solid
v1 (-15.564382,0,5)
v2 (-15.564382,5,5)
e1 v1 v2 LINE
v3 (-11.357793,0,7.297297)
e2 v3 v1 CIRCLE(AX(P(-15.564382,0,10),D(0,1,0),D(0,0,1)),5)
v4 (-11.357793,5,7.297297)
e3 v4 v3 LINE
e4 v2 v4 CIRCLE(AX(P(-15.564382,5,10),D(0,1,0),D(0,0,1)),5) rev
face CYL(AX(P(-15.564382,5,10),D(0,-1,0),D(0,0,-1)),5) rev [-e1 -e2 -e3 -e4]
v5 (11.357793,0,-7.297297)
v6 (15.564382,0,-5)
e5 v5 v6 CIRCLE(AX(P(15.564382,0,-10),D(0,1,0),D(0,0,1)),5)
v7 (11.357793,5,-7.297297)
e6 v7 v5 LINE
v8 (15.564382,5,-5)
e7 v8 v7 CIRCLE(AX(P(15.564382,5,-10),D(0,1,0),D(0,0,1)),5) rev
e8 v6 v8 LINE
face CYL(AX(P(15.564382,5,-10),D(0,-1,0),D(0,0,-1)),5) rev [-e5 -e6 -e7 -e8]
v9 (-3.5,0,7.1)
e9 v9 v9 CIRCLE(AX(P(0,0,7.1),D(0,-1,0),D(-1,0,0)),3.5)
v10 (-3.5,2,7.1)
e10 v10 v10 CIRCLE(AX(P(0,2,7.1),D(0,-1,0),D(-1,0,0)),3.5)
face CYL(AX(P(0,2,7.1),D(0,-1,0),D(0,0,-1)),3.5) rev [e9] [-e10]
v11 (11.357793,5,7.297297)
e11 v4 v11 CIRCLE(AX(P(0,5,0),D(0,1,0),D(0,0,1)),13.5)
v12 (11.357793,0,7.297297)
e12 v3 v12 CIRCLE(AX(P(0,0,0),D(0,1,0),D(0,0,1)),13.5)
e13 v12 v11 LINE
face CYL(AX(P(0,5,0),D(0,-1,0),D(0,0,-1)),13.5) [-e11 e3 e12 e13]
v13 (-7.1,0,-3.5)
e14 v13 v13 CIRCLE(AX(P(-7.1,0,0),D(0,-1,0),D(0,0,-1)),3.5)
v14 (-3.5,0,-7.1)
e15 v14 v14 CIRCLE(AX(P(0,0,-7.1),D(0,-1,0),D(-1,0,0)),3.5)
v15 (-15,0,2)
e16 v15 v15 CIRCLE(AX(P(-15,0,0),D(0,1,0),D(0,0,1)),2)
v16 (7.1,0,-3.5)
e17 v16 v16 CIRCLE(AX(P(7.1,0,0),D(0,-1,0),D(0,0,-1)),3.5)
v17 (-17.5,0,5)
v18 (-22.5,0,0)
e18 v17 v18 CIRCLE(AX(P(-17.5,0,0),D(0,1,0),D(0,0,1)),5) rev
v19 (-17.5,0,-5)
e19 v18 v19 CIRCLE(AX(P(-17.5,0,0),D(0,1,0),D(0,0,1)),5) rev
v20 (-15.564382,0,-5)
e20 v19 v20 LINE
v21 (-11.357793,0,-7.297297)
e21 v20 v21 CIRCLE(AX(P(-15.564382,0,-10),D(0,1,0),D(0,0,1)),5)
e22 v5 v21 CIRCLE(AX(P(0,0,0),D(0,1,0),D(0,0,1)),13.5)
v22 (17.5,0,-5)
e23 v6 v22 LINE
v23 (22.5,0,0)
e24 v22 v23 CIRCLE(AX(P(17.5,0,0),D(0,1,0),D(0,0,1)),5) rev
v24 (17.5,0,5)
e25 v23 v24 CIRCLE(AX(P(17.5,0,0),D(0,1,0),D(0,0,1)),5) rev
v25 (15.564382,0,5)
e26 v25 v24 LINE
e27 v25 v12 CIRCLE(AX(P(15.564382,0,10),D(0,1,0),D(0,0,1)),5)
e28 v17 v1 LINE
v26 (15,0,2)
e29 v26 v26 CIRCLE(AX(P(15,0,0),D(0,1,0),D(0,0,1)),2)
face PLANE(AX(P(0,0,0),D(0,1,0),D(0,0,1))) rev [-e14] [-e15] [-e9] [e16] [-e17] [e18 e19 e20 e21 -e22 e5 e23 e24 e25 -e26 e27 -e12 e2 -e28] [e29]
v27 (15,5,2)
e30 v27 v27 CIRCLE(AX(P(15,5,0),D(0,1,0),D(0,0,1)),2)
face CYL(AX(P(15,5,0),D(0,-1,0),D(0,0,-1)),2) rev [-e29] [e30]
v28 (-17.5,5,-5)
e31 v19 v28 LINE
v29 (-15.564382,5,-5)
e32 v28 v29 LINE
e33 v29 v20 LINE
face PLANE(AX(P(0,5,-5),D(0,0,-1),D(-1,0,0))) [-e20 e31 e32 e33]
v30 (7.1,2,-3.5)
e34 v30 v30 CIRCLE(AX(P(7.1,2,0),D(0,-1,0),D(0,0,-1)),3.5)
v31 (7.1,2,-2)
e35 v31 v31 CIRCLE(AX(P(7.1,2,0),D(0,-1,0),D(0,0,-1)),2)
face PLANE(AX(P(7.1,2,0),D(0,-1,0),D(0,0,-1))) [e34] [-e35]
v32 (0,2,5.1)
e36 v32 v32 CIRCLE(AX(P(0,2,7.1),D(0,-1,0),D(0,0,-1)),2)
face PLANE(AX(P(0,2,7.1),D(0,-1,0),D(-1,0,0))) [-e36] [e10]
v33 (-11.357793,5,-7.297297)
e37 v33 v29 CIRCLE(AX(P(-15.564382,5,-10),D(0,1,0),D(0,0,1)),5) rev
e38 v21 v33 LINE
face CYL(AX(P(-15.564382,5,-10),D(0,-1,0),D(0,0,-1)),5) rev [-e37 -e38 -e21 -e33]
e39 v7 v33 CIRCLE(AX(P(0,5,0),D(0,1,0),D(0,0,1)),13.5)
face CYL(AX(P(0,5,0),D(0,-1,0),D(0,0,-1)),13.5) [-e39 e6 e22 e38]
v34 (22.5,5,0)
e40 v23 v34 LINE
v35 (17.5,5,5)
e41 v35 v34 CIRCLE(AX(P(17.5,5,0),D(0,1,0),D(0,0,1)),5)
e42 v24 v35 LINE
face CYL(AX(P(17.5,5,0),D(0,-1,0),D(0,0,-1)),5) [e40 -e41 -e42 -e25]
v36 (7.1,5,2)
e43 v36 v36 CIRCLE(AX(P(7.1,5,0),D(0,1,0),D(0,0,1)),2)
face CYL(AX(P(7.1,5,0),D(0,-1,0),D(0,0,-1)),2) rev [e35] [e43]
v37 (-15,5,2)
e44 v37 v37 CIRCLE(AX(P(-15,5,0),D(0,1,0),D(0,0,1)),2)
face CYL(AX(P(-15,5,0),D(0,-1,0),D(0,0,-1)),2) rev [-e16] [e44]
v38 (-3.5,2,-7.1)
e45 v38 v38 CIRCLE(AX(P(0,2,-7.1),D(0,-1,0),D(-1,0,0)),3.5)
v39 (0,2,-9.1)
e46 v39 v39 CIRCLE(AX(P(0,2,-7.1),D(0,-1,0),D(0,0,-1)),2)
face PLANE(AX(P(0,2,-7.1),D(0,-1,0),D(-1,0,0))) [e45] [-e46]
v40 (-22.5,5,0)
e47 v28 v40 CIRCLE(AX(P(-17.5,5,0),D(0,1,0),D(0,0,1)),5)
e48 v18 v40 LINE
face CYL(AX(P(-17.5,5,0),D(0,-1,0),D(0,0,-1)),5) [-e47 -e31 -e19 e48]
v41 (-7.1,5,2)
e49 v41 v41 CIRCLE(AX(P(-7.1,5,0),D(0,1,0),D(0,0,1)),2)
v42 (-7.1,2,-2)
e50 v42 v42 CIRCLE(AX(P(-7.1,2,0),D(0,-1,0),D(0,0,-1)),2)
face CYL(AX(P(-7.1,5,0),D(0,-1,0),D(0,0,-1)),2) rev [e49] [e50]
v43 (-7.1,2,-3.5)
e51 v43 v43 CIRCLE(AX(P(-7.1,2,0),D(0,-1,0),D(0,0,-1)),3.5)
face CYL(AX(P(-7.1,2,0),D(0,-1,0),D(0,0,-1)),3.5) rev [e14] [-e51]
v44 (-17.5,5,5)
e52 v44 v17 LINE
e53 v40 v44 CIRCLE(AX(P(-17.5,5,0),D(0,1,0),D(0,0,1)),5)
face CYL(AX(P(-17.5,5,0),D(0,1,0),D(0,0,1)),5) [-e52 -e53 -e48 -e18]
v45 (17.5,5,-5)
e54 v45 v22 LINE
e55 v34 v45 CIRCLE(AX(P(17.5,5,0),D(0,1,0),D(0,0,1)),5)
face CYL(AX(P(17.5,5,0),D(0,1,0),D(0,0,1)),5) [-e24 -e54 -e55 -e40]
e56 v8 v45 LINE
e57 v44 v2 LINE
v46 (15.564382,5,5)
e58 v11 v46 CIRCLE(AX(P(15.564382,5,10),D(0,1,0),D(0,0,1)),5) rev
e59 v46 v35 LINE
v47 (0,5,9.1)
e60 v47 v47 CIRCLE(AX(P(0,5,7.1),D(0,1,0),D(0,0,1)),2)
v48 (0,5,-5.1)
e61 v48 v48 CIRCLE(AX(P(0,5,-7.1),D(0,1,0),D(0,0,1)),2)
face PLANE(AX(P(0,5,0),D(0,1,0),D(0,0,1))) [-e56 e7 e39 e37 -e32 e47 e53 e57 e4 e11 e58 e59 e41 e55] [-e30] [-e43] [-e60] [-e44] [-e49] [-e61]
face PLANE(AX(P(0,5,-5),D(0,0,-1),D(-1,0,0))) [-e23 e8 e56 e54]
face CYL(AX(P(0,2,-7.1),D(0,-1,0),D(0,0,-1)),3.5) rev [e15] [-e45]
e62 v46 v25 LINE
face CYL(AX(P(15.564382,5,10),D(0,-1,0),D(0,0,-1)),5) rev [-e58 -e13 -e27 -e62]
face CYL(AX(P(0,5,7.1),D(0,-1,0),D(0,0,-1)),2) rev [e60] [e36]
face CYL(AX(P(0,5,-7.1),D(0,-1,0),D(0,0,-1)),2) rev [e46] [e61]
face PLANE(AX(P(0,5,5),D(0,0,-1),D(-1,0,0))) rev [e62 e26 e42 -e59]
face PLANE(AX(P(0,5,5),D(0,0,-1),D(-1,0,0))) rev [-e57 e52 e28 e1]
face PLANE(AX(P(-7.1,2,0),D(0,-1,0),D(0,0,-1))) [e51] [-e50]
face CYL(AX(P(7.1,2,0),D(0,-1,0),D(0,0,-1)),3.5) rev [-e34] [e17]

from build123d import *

# Parameters (mm, degrees)
SKETCH1_R           = 2
BOSS_EXTRUDE1_DEPTH = 5
FILLET1_R           = 5
FILLET2_R           = 5
SKETCH3_R           = 3.5
CUT_EXTRUDE2_DEPTH  = 2
CIRPATTERN1_COUNT   = 2
CIRPATTERN1_ANGLE   = 90


with BuildPart() as part:
    # Sketch1 → Boss-Extrude1 (new body)
    with BuildSketch(Plane(origin=(0, 0, 0), x_dir=(1, 0, 0), z_dir=(0, 1, 0))):
        with BuildLine():
            Line((-22.5, 5), (-22.5, -5))
            Line((-22.5, -5), (-12.539936204, -5))
            ThreePointArc((-12.539936204, -5), (0, -13.5), (12.539936204, -5))
            Line((12.539936204, -5), (22.5, -5))
            Line((22.5, -5), (22.5, 5))
            Line((22.5, 5), (12.539936204, 5))
            ThreePointArc((12.539936204, 5), (0, 13.5), (-12.539936204, 5))
            Line((-12.539936204, 5), (-22.5, 5))
        make_face()
        with Locations(Location((15, 0, 0), (0, 0, 270))):
            Circle(SKETCH1_R, mode=Mode.SUBTRACT)
        with Locations(Location((-15, 0, 0), (0, 0, 270))):
            Circle(SKETCH1_R, mode=Mode.SUBTRACT)
        with Locations(Location((-7.1, 0, 0), (0, 0, 270))):
            Circle(SKETCH1_R, mode=Mode.SUBTRACT)
        with Locations(Location((7.1, 0, 0), (0, 0, 270))):
            Circle(SKETCH1_R, mode=Mode.SUBTRACT)
        with Locations(Location((0, -7.1, 0), (0, 0, 270))):
            Circle(SKETCH1_R, mode=Mode.SUBTRACT)
        with Locations(Location((0, 7.1, 0), (0, 0, 270))):
            Circle(SKETCH1_R, mode=Mode.SUBTRACT)
    extrude(amount=BOSS_EXTRUDE1_DEPTH)

    # Fillet1
    fillet1_edges = [part.edges().sort_by_distance(p)[0] for p in [
        (-22.5, 2.5, -5),
        (-22.5, 2.5, 5),
        (22.5, 2.5, 5),
        (22.5, 2.5, -5),
    ]]
    fillet(fillet1_edges, radius=FILLET1_R - 0.0001)  # a hair under: the kernel refuses the full size

    # Fillet2
    fillet2_edges = [part.edges().sort_by_distance(p)[0] for p in [
        (-12.539936204, 2.5, -5),
        (12.539936204, 2.5, -5),
        (12.539936204, 2.5, 5),
        (-12.539936204, 2.5, 5),
    ]]
    fillet(fillet2_edges, radius=FILLET2_R)

    # Sketch3 → Cut-Extrude2 (cut)
    with BuildSketch(Plane.XZ):
        with Locations(Location((-7.1, 0, 0), (0, 0, 270))):
            Circle(SKETCH3_R)
        with Locations(Location((7.1, 0, 0), (0, 0, 270))):
            Circle(SKETCH3_R)
    cut_extrude2 = extrude(amount=-CUT_EXTRUDE2_DEPTH, mode=Mode.SUBTRACT)

    # CirPattern1: Cut-Extrude2 ×2 about axis
    cirpattern1_axis = Axis((0, 0, 0), (0, 1, 0))
    for i in range(1, CIRPATTERN1_COUNT):
        add(cut_extrude2.rotate(cirpattern1_axis, i * CIRPATTERN1_ANGLE / (CIRPATTERN1_COUNT - 1)), mode=Mode.SUBTRACT)


solid = part.part
